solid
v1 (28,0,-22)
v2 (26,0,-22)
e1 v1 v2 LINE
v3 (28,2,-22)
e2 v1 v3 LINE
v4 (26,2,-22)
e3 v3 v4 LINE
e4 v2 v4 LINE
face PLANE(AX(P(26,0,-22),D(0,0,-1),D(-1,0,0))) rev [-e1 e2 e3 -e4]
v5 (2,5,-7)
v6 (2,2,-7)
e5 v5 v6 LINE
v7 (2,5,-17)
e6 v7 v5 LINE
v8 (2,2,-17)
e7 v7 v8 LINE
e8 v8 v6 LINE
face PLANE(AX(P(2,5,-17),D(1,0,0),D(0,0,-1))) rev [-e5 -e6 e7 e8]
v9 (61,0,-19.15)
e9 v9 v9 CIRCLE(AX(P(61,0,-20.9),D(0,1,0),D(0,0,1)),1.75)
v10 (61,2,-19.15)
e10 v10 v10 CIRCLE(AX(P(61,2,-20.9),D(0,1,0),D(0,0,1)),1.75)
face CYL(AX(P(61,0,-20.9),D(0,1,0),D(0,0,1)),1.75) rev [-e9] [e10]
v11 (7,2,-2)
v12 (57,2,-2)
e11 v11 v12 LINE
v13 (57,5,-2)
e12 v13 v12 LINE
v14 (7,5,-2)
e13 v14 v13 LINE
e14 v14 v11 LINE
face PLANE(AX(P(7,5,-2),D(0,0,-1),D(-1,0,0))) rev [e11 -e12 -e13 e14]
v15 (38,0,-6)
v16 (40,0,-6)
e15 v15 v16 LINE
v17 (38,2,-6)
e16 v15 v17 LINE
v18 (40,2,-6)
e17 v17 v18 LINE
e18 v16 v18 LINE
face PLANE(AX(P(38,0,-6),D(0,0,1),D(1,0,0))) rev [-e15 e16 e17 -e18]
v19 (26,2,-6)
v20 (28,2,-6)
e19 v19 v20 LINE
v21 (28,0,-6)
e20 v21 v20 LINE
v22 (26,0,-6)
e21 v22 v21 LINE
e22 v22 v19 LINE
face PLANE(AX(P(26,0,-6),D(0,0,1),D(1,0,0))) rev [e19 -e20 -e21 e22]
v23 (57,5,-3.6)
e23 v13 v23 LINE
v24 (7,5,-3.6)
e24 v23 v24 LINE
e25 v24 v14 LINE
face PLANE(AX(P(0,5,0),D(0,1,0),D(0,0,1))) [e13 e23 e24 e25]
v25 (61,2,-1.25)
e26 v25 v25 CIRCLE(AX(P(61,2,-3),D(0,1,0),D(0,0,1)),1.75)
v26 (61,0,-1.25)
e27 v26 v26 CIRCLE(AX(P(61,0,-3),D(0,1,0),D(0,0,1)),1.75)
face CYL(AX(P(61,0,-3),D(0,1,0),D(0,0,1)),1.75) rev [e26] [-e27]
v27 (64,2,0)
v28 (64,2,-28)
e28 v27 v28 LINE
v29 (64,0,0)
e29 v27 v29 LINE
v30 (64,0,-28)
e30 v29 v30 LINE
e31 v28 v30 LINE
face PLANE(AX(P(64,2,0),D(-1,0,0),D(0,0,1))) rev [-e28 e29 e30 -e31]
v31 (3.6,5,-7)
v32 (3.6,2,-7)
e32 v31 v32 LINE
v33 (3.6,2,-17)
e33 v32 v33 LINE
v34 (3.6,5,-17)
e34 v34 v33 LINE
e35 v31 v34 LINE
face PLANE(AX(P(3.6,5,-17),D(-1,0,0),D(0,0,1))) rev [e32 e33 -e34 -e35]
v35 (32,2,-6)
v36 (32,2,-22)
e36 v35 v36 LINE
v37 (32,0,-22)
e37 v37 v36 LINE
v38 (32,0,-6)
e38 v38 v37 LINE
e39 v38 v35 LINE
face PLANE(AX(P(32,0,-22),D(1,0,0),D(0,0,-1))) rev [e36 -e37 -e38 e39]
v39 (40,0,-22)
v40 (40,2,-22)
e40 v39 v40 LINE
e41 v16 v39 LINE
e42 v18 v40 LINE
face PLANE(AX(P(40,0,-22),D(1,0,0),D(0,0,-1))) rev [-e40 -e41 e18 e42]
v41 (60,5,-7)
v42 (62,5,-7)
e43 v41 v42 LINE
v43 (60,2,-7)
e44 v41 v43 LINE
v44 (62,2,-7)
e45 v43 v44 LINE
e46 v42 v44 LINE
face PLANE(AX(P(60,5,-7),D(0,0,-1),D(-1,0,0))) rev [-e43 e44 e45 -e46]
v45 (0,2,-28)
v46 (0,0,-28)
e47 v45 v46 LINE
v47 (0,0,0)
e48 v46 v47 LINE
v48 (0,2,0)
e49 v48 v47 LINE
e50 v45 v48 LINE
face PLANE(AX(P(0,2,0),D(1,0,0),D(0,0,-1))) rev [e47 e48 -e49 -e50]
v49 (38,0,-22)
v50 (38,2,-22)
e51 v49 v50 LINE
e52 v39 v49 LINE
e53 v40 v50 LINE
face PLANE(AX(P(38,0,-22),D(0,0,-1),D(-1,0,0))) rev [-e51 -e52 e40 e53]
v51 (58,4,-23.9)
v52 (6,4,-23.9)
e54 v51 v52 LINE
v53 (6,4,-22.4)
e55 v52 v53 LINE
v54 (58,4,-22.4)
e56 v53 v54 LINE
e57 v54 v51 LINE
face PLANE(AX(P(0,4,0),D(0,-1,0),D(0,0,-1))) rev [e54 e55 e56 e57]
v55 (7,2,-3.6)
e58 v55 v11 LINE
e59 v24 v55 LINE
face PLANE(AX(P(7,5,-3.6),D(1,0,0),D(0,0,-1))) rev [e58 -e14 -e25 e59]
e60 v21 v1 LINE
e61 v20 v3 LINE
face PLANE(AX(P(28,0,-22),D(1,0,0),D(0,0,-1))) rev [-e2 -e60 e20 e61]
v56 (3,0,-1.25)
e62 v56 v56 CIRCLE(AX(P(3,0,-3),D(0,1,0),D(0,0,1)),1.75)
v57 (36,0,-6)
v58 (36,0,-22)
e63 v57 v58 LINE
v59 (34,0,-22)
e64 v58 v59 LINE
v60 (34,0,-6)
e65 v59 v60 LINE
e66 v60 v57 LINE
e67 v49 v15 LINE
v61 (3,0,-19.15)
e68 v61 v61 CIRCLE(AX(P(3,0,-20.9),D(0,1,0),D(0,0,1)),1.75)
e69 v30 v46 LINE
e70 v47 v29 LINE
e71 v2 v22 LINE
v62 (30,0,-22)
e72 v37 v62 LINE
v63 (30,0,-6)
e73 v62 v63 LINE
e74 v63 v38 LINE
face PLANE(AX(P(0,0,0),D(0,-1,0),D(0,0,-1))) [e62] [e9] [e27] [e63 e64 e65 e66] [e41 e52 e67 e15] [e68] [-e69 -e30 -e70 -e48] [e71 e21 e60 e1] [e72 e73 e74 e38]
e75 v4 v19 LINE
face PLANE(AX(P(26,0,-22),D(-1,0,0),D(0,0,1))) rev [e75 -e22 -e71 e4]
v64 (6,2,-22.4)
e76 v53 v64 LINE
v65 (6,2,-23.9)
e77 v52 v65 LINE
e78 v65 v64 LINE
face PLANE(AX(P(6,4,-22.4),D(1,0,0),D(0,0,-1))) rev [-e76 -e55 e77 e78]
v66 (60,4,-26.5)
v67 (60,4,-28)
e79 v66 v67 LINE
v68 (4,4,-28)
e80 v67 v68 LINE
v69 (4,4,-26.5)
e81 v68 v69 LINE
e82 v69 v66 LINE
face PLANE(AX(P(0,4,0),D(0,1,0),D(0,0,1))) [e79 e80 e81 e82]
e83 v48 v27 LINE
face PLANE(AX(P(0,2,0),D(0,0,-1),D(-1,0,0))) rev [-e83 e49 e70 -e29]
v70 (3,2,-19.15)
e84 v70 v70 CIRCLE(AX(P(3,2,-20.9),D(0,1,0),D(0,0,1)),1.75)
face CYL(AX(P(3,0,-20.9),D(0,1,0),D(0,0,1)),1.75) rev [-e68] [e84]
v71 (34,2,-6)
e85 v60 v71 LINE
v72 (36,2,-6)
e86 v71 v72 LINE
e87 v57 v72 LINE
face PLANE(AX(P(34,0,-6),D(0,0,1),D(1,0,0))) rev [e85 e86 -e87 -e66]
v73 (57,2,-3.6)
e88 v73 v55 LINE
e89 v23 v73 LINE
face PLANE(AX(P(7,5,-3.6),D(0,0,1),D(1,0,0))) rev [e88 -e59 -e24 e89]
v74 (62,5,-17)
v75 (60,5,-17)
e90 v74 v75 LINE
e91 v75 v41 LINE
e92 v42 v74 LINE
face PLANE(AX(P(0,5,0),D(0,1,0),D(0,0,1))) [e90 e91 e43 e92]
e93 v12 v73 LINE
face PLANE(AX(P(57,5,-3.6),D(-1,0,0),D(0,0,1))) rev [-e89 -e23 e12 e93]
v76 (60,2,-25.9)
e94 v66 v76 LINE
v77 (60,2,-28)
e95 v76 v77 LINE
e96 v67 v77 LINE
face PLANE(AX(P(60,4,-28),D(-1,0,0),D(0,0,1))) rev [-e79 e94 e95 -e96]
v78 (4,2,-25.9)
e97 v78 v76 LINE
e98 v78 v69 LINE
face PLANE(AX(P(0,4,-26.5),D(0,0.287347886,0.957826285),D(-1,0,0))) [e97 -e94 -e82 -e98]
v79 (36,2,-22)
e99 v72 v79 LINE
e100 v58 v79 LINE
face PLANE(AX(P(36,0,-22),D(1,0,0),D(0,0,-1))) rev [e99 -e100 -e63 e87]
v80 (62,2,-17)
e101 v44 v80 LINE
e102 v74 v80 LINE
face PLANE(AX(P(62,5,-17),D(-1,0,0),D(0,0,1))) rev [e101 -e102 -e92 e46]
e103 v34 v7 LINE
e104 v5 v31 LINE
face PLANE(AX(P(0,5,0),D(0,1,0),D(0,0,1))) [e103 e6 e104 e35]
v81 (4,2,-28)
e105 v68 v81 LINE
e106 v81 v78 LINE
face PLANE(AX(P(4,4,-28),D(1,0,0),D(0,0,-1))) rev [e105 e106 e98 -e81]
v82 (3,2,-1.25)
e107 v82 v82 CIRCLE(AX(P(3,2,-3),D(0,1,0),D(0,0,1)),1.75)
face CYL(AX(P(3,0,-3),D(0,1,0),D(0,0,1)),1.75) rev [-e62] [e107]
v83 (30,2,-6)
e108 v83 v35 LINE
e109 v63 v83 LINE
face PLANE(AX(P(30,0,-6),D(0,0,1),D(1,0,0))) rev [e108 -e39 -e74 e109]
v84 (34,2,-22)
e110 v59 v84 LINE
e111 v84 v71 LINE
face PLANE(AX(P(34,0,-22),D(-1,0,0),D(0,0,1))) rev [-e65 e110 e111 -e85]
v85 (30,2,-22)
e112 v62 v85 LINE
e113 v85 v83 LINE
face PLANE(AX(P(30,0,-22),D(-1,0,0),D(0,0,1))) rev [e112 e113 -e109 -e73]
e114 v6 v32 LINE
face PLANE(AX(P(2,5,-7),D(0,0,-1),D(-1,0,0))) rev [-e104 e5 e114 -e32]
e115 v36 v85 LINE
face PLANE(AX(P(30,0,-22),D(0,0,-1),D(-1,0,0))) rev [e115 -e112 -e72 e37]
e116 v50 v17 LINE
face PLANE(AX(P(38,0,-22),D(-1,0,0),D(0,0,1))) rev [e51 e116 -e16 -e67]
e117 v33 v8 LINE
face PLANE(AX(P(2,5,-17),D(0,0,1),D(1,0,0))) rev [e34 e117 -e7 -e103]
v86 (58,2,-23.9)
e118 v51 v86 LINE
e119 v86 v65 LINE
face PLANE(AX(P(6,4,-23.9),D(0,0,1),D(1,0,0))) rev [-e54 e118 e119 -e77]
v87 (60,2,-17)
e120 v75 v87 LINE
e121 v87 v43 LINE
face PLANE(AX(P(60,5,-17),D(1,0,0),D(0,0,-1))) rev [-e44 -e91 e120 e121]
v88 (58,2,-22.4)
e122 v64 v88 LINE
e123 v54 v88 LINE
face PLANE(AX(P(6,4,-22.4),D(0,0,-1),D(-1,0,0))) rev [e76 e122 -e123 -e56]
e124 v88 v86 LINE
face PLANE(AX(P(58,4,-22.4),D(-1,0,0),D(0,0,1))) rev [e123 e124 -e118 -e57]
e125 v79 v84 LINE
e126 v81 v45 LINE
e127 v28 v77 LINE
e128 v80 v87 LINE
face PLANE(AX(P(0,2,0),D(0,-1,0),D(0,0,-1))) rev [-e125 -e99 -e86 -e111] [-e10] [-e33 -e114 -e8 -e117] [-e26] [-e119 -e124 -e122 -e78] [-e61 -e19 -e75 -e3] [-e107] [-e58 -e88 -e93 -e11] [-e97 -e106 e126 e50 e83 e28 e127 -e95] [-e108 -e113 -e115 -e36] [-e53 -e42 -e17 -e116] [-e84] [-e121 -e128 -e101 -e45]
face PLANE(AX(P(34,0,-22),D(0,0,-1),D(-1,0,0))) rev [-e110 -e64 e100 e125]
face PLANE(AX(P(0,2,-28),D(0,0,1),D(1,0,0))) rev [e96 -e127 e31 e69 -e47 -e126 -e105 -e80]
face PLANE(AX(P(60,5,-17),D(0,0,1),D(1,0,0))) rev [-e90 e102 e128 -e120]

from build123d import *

# Parameters (mm, degrees)
SKIZZE1_W                       = 64
SKIZZE1_H                       = 28
AUFSATZ_LINEAR_AUSTRAGEN1_DEPTH = 2
SKIZZE2_R                       = 1.75
SCHNITT_LINEAR_AUSTRAGEN1_DEPTH = 70.885620839
SKIZZE3_W                       = 2
SKIZZE3_H                       = 16
SCHNITT_LINEAR_AUSTRAGEN2_DEPTH = 70.885620839
LINEARES_MUSTER1_COUNT          = 4
LINEARES_MUSTER1_PITCH          = 4
SKIZZE5_W                       = 1.6
SKIZZE5_H                       = 10
SKIZZE5_W_2                     = 50
SKIZZE5_H_2                     = 1.6
SKIZZE5_W_3                     = 2
AUFSATZ_LINEAR_AUSTRAGEN2_DEPTH = 3
SKIZZE6_W                       = 52
SKIZZE6_H                       = 1.5
AUFSATZ_LINEAR_AUSTRAGEN3_DEPTH = 2
SKIZZE7_W                       = 56
SKIZZE7_H                       = 2.1
AUFSATZ_LINEAR_AUSTRAGEN4_DEPTH = 2
FASE1_SIZE2                     = 0.6
FASE1_SIZE                      = 2


with BuildPart() as part:
    # Skizze1 → Aufsatz-Linear austragen1 (new body)
    with BuildSketch(Plane(origin=(0, 0, 0), x_dir=(1, 0, 0), z_dir=(0, 1, 0))):
        with Locations((32, 14)):
            Rectangle(SKIZZE1_W, SKIZZE1_H)
    extrude(amount=AUFSATZ_LINEAR_AUSTRAGEN1_DEPTH)

    # Skizze2 → Schnitt-Linear austragen1 (cut, through all)
    with BuildSketch(Plane(origin=(0, 2, 0), x_dir=(1, 0, 0), z_dir=(0, 1, 0))):
        with Locations(Location((3, 3, 0), (0, 0, 270))):
            Circle(SKIZZE2_R)
        with Locations(Location((3, 20.9, 0), (0, 0, 270))):
            Circle(SKIZZE2_R)
        with Locations(Location((61, 20.9, 0), (0, 0, 270))):
            Circle(SKIZZE2_R)
        with Locations(Location((61, 3, 0), (0, 0, 270))):
            Circle(SKIZZE2_R)
    extrude(amount=-SCHNITT_LINEAR_AUSTRAGEN1_DEPTH, mode=Mode.SUBTRACT)

    # Skizze3 → Schnitt-Linear austragen2 (cut, through all)
    with BuildSketch(Plane(origin=(0, 2, 0), x_dir=(1, 0, 0), z_dir=(0, 1, 0))):
        with Locations((27, 14)):
            Rectangle(SKIZZE3_W, SKIZZE3_H)
    schnitt_linear_austragen2 = extrude(amount=-SCHNITT_LINEAR_AUSTRAGEN2_DEPTH, mode=Mode.SUBTRACT)

    # Lineares Muster1: Schnitt-Linear austragen2 ×4
    with Locations(*[(i * LINEARES_MUSTER1_PITCH, 0, 0) for i in range(1, LINEARES_MUSTER1_COUNT)]):
        add(schnitt_linear_austragen2, mode=Mode.SUBTRACT)

    # Skizze5 → Aufsatz-Linear austragen2 (add)
    with BuildSketch(Plane(origin=(0, 2, 0), x_dir=(1, 0, 0), z_dir=(0, 1, 0))):
        with Locations((2.8, 12)):
            Rectangle(SKIZZE5_W, SKIZZE5_H)
        with Locations((32, 2.8)):
            Rectangle(SKIZZE5_W_2, SKIZZE5_H_2)
        with Locations((61, 12)):
            Rectangle(SKIZZE5_W_3, SKIZZE5_H)
    extrude(amount=AUFSATZ_LINEAR_AUSTRAGEN2_DEPTH)

    # Skizze6 → Aufsatz-Linear austragen3 (add)
    with BuildSketch(Plane(origin=(0, 2, 0), x_dir=(1, 0, 0), z_dir=(0, 1, 0))):
        with Locations((32, 23.15)):
            Rectangle(SKIZZE6_W, SKIZZE6_H)
    extrude(amount=AUFSATZ_LINEAR_AUSTRAGEN3_DEPTH)

    # Skizze7 → Aufsatz-Linear austragen4 (add)
    with BuildSketch(Plane(origin=(0, 2, 0), x_dir=(1, 0, 0), z_dir=(0, 1, 0))):
        with Locations((32, 26.95)):
            Rectangle(SKIZZE7_W, SKIZZE7_H)
    extrude(amount=AUFSATZ_LINEAR_AUSTRAGEN4_DEPTH)

    # Fase1
    fase1_edges = [part.edges().sort_by_distance(p)[0] for p in [
        (32, 4, -25.9),
    ]]
    fase1_side = [part.faces().sort_by_distance(p)[0] for p in [
        (32, 3.988, -25.9),
    ]]
    chamfer(fase1_edges, length=FASE1_SIZE - 0.0001, length2=FASE1_SIZE2 - 0.0001, reference=fase1_side[0])  # a hair under: the kernel refuses the full size


solid = part.part
